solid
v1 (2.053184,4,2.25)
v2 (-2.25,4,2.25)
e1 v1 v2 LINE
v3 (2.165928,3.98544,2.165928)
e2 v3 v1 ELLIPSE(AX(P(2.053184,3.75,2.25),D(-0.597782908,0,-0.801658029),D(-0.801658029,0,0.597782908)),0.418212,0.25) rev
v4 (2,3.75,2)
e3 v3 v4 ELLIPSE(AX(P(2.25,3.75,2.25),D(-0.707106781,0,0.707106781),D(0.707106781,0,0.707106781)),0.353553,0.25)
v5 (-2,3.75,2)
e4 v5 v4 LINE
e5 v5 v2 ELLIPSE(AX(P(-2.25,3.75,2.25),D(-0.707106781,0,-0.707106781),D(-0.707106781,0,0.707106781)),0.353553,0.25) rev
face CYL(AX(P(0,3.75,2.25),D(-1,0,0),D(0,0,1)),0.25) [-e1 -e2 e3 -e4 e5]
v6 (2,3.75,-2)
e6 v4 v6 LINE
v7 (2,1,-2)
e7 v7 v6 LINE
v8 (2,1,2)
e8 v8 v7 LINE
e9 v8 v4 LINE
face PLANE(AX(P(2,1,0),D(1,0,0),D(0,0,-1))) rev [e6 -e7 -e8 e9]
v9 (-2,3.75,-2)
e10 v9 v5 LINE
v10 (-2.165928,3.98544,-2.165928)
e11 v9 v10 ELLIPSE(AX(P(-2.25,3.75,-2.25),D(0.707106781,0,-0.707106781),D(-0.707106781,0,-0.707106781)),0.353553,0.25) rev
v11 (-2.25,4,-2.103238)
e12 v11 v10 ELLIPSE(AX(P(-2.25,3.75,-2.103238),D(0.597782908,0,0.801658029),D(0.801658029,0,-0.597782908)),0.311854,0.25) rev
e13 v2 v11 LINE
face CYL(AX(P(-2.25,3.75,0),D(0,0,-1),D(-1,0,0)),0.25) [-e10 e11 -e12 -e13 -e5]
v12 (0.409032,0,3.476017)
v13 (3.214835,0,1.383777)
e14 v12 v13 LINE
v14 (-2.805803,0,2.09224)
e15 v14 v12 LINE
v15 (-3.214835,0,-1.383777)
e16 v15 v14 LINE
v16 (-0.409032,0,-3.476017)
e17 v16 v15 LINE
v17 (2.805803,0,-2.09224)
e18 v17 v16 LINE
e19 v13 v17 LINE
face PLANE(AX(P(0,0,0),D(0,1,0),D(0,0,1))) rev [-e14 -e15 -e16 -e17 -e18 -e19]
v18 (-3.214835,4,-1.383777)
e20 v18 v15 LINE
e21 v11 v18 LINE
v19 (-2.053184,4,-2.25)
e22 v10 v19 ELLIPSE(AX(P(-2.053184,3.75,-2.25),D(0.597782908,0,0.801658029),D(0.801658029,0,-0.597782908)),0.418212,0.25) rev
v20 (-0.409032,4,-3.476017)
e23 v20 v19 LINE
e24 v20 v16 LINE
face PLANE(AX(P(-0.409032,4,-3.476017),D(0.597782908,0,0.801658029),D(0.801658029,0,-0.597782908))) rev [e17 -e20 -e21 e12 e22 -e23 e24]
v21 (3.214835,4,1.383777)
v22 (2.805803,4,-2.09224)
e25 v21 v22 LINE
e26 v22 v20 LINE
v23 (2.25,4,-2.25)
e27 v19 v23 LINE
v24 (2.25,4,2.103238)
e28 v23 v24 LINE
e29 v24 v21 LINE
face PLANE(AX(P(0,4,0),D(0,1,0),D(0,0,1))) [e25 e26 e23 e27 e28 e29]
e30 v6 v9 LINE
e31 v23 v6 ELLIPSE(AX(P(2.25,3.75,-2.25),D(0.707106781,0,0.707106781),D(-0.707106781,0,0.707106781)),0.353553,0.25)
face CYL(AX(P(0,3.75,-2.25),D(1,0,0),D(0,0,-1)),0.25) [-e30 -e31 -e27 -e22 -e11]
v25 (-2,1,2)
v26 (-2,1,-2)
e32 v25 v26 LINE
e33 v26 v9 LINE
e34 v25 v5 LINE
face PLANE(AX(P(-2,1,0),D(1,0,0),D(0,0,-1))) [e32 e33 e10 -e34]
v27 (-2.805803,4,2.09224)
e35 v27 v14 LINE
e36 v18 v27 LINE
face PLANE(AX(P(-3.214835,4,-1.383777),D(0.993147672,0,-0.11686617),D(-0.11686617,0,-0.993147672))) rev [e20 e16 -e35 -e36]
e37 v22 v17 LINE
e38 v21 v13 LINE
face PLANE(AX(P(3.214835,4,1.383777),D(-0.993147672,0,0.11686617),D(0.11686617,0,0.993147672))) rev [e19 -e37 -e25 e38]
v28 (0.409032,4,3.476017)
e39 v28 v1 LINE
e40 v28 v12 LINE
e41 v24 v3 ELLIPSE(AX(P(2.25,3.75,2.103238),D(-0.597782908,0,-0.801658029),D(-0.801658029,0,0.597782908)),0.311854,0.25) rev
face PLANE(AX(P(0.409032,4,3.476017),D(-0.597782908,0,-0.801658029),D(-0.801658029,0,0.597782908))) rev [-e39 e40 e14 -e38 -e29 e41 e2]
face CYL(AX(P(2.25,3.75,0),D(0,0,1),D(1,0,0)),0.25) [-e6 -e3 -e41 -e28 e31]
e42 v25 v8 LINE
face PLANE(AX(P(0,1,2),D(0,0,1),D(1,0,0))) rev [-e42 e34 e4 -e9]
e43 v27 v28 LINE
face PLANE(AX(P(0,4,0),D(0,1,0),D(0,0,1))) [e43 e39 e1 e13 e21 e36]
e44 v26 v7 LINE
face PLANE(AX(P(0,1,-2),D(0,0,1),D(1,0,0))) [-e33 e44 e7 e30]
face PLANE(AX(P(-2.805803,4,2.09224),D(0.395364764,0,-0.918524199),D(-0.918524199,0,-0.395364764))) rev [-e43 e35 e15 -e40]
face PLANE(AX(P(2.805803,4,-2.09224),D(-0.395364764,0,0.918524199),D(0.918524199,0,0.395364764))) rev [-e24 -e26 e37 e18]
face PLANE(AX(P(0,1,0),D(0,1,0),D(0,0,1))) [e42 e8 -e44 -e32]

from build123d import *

# Parameters (mm, degrees)
BOSS_EXTRUDE1_DEPTH = 4
SKETCH2_W           = 4
SKETCH2_H           = 4
CUT_EXTRUDE1_DEPTH  = 3
FILLET1_R           = 0.25


with BuildPart() as part:
    # Sketch1 → Boss-Extrude1 (new body)
    with BuildSketch(Plane(origin=(0, 0, 0), x_dir=(1, 0, 0), z_dir=(0, 1, 0))):
        Polygon((3.214834695, -1.383776673), (2.8058031, 2.092240179), (-0.409031596, 3.476016852), (-3.214834695, 1.383776673), (-2.8058031, -2.092240179), (0.409031596, -3.476016852), align=None)
    extrude(amount=BOSS_EXTRUDE1_DEPTH)

    # Sketch2 → Cut-Extrude1 (cut)
    with BuildSketch(Plane(origin=(0, 4, 0), x_dir=(1, 0, 0), z_dir=(0, 1, 0))):
        Rectangle(SKETCH2_W, SKETCH2_H)
    extrude(amount=-CUT_EXTRUDE1_DEPTH, mode=Mode.SUBTRACT)

    # Fillet1
    # the kernel refuses this fillet: 0.25 mm, written as the material it takes off along each edge
    with BuildSketch(Plane(origin=(-2, 4, -2), x_dir=(-1, 0, 0), z_dir=(0, 0, 1)), Plane(origin=(2, 4, -2), x_dir=(0, 0, -1), z_dir=(-1, 0, 0)), Plane(origin=(-2, 4, 2), x_dir=(0, 0, 1), z_dir=(1, 0, 0)), Plane(origin=(2, 4, 2), x_dir=(1, 0, 0), z_dir=(0, 0, -1))) as fillet1_piece_1:
        with BuildLine():
            CenterArc((FILLET1_R, FILLET1_R), FILLET1_R, 180, 90)
            Line((0, FILLET1_R), (-FILLET1_R * 0.02, FILLET1_R))
            Line((-FILLET1_R * 0.02, FILLET1_R), (-FILLET1_R * 0.02, -FILLET1_R * 0.02))
            Line((-FILLET1_R * 0.02, -FILLET1_R * 0.02), (FILLET1_R, -FILLET1_R * 0.02))
            Line((FILLET1_R, -FILLET1_R * 0.02), (FILLET1_R, 0))
        make_face()
    extrude(amount=4, mode=Mode.SUBTRACT)
    with BuildSketch(Plane(origin=(2, 4, -2), x_dir=(0, 0, -1), z_dir=(-1, 0, 0))) as fillet1_piece_2a_section:
        with BuildLine():
            CenterArc((FILLET1_R, FILLET1_R), FILLET1_R, 180, 90)
            Line((0, FILLET1_R), (-FILLET1_R * 0.02, FILLET1_R))
            Line((-FILLET1_R * 0.02, FILLET1_R), (-FILLET1_R * 0.02, -FILLET1_R * 0.02))
            Line((-FILLET1_R * 0.02, -FILLET1_R * 0.02), (FILLET1_R, -FILLET1_R * 0.02))
            Line((FILLET1_R, -FILLET1_R * 0.02), (FILLET1_R, 0))
        make_face()
    fillet1_piece_2a = extrude(amount=4.625, mode=Mode.PRIVATE)
    fillet1_piece_2a = split(fillet1_piece_2a, bisect_by=Plane(origin=(-2, 3.943401221, -2.056598779), z_dir=(-1, 0, 0)), keep=Keep.TOP, mode=Mode.PRIVATE)
    with BuildSketch(Plane(origin=(-2, 4, -2.625), x_dir=(-1, 0, 0), z_dir=(0, 0, 1))) as fillet1_piece_2b_section:
        with BuildLine():
            CenterArc((FILLET1_R, FILLET1_R), FILLET1_R, 180, 90)
            Line((0, FILLET1_R), (-FILLET1_R * 0.02, FILLET1_R))
            Line((-FILLET1_R * 0.02, FILLET1_R), (-FILLET1_R * 0.02, -FILLET1_R * 0.02))
            Line((-FILLET1_R * 0.02, -FILLET1_R * 0.02), (FILLET1_R, -FILLET1_R * 0.02))
            Line((FILLET1_R, -FILLET1_R * 0.02), (FILLET1_R, 0))
        make_face()
    fillet1_piece_2b = extrude(amount=4.625, mode=Mode.PRIVATE)
    fillet1_piece_2b = split(fillet1_piece_2b, bisect_by=Plane(origin=(-2.056598779, 3.943401221, -2), z_dir=(0, 0, -1)), keep=Keep.TOP, mode=Mode.PRIVATE)
    fillet1_piece_2 = fillet1_piece_2a & fillet1_piece_2b
    add(fillet1_piece_2, mode=Mode.SUBTRACT)
    with BuildSketch(Plane(origin=(-2.625, 4, 2), x_dir=(0, 0, 1), z_dir=(1, 0, 0))) as fillet1_piece_3a_section:
        with BuildLine():
            CenterArc((FILLET1_R, FILLET1_R), FILLET1_R, 180, 90)
            Line((0, FILLET1_R), (-FILLET1_R * 0.02, FILLET1_R))
            Line((-FILLET1_R * 0.02, FILLET1_R), (-FILLET1_R * 0.02, -FILLET1_R * 0.02))
            Line((-FILLET1_R * 0.02, -FILLET1_R * 0.02), (FILLET1_R, -FILLET1_R * 0.02))
            Line((FILLET1_R, -FILLET1_R * 0.02), (FILLET1_R, 0))
        make_face()
    fillet1_piece_3a = extrude(amount=4.625, mode=Mode.PRIVATE)
    fillet1_piece_3a = split(fillet1_piece_3a, bisect_by=Plane(origin=(-2, 3.943401221, 2.056598779), z_dir=(-1, 0, 0)), keep=Keep.TOP, mode=Mode.PRIVATE)
    with BuildSketch(Plane(origin=(-2, 4, -2), x_dir=(-1, 0, 0), z_dir=(0, 0, 1))) as fillet1_piece_3b_section:
        with BuildLine():
            CenterArc((FILLET1_R, FILLET1_R), FILLET1_R, 180, 90)
            Line((0, FILLET1_R), (-FILLET1_R * 0.02, FILLET1_R))
            Line((-FILLET1_R * 0.02, FILLET1_R), (-FILLET1_R * 0.02, -FILLET1_R * 0.02))
            Line((-FILLET1_R * 0.02, -FILLET1_R * 0.02), (FILLET1_R, -FILLET1_R * 0.02))
            Line((FILLET1_R, -FILLET1_R * 0.02), (FILLET1_R, 0))
        make_face()
    fillet1_piece_3b = extrude(amount=4.625, mode=Mode.PRIVATE)
    fillet1_piece_3b = split(fillet1_piece_3b, bisect_by=Plane(origin=(-2.056598779, 3.943401221, 2), z_dir=(0, 0, 1)), keep=Keep.TOP, mode=Mode.PRIVATE)
    fillet1_piece_3 = fillet1_piece_3a & fillet1_piece_3b
    add(fillet1_piece_3, mode=Mode.SUBTRACT)
    with BuildSketch(Plane(origin=(2, 4, 2), x_dir=(1, 0, 0), z_dir=(0, 0, -1))) as fillet1_piece_4a_section:
        with BuildLine():
            CenterArc((FILLET1_R, FILLET1_R), FILLET1_R, 180, 90)
            Line((0, FILLET1_R), (-FILLET1_R * 0.02, FILLET1_R))
            Line((-FILLET1_R * 0.02, FILLET1_R), (-FILLET1_R * 0.02, -FILLET1_R * 0.02))
            Line((-FILLET1_R * 0.02, -FILLET1_R * 0.02), (FILLET1_R, -FILLET1_R * 0.02))
            Line((FILLET1_R, -FILLET1_R * 0.02), (FILLET1_R, 0))
        make_face()
    fillet1_piece_4a = extrude(amount=4.625, mode=Mode.PRIVATE)
    fillet1_piece_4a = split(fillet1_piece_4a, bisect_by=Plane(origin=(2.056598779, 3.943401221, -2), z_dir=(0, 0, -1)), keep=Keep.TOP, mode=Mode.PRIVATE)
    with BuildSketch(Plane(origin=(2.625, 4, -2), x_dir=(0, 0, -1), z_dir=(-1, 0, 0))) as fillet1_piece_4b_section:
        with BuildLine():
            CenterArc((FILLET1_R, FILLET1_R), FILLET1_R, 180, 90)
            Line((0, FILLET1_R), (-FILLET1_R * 0.02, FILLET1_R))
            Line((-FILLET1_R * 0.02, FILLET1_R), (-FILLET1_R * 0.02, -FILLET1_R * 0.02))
            Line((-FILLET1_R * 0.02, -FILLET1_R * 0.02), (FILLET1_R, -FILLET1_R * 0.02))
            Line((FILLET1_R, -FILLET1_R * 0.02), (FILLET1_R, 0))
        make_face()
    fillet1_piece_4b = extrude(amount=4.625, mode=Mode.PRIVATE)
    fillet1_piece_4b = split(fillet1_piece_4b, bisect_by=Plane(origin=(2, 3.943401221, -2.056598779), z_dir=(1, 0, 0)), keep=Keep.TOP, mode=Mode.PRIVATE)
    fillet1_piece_4 = fillet1_piece_4a & fillet1_piece_4b
    add(fillet1_piece_4, mode=Mode.SUBTRACT)
    with BuildSketch(Plane(origin=(-2, 4, 2), x_dir=(0, 0, 1), z_dir=(1, 0, 0))) as fillet1_piece_5a_section:
        with BuildLine():
            CenterArc((FILLET1_R, FILLET1_R), FILLET1_R, 180, 90)
            Line((0, FILLET1_R), (-FILLET1_R * 0.02, FILLET1_R))
            Line((-FILLET1_R * 0.02, FILLET1_R), (-FILLET1_R * 0.02, -FILLET1_R * 0.02))
            Line((-FILLET1_R * 0.02, -FILLET1_R * 0.02), (FILLET1_R, -FILLET1_R * 0.02))
            Line((FILLET1_R, -FILLET1_R * 0.02), (FILLET1_R, 0))
        make_face()
    fillet1_piece_5a = extrude(amount=4.625, mode=Mode.PRIVATE)
    fillet1_piece_5a = split(fillet1_piece_5a, bisect_by=Plane(origin=(2, 3.943401221, 2.056598779), z_dir=(1, 0, 0)), keep=Keep.TOP, mode=Mode.PRIVATE)
    with BuildSketch(Plane(origin=(2, 4, 2.625), x_dir=(1, 0, 0), z_dir=(0, 0, -1))) as fillet1_piece_5b_section:
        with BuildLine():
            CenterArc((FILLET1_R, FILLET1_R), FILLET1_R, 180, 90)
            Line((0, FILLET1_R), (-FILLET1_R * 0.02, FILLET1_R))
            Line((-FILLET1_R * 0.02, FILLET1_R), (-FILLET1_R * 0.02, -FILLET1_R * 0.02))
            Line((-FILLET1_R * 0.02, -FILLET1_R * 0.02), (FILLET1_R, -FILLET1_R * 0.02))
            Line((FILLET1_R, -FILLET1_R * 0.02), (FILLET1_R, 0))
        make_face()
    fillet1_piece_5b = extrude(amount=4.625, mode=Mode.PRIVATE)
    fillet1_piece_5b = split(fillet1_piece_5b, bisect_by=Plane(origin=(2.056598779, 3.943401221, 2), z_dir=(0, 0, 1)), keep=Keep.TOP, mode=Mode.PRIVATE)
    fillet1_piece_5 = fillet1_piece_5a & fillet1_piece_5b
    add(fillet1_piece_5, mode=Mode.SUBTRACT)


solid = part.part
